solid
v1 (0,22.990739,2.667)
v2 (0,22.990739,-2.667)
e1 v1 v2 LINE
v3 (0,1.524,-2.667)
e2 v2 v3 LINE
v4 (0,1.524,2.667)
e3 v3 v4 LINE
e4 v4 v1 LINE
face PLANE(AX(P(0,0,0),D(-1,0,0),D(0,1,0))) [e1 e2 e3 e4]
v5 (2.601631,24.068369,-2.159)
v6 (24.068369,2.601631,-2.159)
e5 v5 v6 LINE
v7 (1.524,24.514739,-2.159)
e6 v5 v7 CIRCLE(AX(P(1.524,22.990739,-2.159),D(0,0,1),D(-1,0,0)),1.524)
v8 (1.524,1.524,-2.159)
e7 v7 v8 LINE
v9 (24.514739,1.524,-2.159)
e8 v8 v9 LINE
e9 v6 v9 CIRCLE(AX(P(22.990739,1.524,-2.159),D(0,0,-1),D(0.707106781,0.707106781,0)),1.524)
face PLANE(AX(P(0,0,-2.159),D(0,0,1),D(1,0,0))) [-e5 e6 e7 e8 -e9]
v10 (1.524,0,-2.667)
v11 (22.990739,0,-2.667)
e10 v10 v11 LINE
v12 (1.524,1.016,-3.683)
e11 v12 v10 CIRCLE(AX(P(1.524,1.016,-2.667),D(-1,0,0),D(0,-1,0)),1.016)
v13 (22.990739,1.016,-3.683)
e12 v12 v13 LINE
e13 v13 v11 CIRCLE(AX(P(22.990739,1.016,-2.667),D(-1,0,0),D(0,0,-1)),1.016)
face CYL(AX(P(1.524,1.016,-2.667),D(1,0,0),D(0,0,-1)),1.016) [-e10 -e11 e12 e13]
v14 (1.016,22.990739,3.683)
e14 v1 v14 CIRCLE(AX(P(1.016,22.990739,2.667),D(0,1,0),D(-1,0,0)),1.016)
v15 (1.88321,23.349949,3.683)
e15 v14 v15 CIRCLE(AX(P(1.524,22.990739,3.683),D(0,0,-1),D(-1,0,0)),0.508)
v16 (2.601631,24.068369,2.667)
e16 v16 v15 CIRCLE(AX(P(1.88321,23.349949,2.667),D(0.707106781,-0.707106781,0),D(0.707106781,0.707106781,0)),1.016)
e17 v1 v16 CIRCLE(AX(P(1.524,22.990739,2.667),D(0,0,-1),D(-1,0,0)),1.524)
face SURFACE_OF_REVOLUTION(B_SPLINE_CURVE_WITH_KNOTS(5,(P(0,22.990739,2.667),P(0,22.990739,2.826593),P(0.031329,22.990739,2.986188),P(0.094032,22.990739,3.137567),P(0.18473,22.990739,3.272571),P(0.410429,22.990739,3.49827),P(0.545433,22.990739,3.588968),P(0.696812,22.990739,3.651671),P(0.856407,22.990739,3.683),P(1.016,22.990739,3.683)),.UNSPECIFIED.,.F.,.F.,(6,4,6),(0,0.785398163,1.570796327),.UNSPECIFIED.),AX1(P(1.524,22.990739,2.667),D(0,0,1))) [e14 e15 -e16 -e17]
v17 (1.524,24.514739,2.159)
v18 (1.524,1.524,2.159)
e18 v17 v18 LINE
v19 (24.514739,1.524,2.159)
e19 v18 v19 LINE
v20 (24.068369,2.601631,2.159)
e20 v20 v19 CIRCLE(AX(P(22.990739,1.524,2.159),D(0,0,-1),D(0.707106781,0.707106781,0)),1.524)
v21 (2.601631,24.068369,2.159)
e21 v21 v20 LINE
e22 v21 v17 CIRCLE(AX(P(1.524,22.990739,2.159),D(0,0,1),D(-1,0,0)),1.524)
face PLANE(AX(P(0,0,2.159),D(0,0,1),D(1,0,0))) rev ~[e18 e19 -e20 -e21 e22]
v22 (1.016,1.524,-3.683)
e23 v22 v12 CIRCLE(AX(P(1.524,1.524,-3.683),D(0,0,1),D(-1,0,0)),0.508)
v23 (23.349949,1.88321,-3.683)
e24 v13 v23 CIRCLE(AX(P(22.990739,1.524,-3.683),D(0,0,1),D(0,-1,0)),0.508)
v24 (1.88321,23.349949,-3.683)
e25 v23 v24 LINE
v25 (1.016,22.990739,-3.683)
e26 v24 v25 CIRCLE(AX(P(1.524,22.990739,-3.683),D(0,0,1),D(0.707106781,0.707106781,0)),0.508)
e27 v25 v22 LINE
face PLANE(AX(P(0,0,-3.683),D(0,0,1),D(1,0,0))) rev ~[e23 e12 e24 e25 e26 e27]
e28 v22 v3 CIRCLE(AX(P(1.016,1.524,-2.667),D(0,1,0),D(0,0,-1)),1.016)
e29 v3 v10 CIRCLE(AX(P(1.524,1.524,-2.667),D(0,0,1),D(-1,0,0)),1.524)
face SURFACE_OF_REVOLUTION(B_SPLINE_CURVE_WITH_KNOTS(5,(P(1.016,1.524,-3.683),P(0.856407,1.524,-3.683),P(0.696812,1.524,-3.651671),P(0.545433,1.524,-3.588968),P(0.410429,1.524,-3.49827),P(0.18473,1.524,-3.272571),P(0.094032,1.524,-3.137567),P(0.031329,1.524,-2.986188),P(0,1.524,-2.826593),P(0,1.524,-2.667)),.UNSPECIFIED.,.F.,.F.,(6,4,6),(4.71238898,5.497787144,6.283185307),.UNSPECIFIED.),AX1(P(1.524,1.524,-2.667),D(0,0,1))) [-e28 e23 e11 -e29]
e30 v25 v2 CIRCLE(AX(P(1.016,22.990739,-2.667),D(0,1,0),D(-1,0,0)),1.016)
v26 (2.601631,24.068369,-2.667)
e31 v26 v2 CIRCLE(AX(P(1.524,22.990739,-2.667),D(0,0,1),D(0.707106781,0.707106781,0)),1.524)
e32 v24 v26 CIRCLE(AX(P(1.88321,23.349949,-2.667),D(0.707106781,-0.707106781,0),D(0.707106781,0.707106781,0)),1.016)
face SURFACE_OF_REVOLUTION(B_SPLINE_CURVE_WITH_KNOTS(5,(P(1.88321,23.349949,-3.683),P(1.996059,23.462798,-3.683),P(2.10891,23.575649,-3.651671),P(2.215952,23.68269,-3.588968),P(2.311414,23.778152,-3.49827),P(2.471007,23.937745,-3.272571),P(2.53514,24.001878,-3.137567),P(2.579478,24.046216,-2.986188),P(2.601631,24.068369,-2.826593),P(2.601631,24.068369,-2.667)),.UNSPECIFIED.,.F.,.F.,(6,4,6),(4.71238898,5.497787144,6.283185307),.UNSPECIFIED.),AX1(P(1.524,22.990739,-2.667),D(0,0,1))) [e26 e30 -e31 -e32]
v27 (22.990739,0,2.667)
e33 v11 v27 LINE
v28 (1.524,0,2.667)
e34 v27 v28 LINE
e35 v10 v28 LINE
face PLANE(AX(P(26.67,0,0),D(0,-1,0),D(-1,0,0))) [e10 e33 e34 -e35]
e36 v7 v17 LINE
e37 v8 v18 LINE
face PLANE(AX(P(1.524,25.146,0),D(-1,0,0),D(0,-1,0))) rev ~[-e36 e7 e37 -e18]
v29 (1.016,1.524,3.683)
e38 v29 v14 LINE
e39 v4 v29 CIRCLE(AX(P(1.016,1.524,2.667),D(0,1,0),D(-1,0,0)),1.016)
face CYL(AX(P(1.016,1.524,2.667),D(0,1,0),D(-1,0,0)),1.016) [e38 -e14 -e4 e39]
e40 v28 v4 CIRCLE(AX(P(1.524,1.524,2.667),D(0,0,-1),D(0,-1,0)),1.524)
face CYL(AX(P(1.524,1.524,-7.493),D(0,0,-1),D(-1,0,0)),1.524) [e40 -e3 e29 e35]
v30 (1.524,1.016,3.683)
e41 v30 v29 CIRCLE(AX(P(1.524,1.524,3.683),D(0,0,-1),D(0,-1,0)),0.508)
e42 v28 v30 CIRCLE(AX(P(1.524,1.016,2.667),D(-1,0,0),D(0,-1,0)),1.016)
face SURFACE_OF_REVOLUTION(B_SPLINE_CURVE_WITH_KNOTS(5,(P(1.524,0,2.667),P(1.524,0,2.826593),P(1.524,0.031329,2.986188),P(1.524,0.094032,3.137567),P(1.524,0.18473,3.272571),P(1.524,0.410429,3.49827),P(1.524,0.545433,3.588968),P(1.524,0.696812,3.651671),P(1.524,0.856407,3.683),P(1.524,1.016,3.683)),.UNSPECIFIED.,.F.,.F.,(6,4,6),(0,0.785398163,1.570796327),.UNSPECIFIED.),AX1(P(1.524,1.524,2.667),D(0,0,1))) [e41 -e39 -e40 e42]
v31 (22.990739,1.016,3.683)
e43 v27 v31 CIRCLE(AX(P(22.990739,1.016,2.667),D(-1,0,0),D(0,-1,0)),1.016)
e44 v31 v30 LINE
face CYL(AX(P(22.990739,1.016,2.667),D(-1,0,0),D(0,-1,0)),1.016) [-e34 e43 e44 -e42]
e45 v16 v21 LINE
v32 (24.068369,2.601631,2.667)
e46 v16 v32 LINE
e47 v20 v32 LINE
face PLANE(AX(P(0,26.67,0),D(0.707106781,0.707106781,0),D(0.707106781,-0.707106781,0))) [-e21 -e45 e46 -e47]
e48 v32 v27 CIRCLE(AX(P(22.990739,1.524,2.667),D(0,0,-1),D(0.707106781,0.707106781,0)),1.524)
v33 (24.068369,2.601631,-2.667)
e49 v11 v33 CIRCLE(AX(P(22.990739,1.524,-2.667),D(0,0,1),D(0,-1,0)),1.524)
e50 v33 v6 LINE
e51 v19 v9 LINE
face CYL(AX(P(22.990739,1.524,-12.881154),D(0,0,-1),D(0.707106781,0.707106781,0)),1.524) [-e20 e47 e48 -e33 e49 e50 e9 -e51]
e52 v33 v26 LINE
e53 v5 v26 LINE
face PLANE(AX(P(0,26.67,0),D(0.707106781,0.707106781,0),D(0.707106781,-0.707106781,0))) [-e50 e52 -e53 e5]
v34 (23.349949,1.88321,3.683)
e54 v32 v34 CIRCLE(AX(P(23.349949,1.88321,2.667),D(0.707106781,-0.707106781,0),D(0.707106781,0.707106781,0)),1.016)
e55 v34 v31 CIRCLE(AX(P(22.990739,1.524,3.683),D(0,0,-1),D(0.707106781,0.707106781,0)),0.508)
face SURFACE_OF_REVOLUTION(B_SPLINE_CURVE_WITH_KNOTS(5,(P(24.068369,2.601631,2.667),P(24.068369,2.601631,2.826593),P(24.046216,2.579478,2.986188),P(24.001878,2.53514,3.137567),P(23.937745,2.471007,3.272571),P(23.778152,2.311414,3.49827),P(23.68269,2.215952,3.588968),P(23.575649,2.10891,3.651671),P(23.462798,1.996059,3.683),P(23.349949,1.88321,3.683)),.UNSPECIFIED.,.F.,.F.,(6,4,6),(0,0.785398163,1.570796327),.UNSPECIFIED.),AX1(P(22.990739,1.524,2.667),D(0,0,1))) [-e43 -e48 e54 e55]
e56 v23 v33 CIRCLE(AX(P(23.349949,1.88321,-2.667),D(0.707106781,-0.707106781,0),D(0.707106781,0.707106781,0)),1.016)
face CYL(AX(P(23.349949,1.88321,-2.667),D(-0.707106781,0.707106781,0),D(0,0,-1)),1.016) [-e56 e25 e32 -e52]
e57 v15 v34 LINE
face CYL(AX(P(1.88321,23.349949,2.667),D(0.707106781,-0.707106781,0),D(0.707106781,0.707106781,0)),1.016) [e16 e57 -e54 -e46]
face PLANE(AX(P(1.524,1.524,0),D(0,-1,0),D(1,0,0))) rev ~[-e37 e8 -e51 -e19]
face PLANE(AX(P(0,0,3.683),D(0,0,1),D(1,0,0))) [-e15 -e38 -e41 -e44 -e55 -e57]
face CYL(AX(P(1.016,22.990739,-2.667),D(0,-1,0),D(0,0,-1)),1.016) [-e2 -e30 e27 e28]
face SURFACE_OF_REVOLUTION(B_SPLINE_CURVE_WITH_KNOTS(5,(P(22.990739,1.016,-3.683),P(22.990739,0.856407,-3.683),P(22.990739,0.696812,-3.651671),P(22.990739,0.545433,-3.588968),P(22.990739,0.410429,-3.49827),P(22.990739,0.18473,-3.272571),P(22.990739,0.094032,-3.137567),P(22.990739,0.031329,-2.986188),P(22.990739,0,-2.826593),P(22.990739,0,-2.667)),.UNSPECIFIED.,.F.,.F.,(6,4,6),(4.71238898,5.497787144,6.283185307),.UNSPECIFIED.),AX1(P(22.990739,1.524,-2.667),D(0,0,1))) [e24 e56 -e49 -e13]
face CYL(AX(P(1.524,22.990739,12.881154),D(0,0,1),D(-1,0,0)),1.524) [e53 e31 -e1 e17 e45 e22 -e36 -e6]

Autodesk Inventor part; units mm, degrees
ref_plane "YZ Plane" through (0, 0, 0) normal (1, 0, 0) x (0, 1, 0)
ref_plane "XZ Plane" through (0, 0, 0) normal (0, 1, 0) x (-1, 0, 0)
ref_plane "XY Plane" through (0, 0, 0) normal (0, 0, 1) x (1, 0, 0)
sketch "Sketch1" plane through (0, 0, 0) normal (0, 0, 1) x (1, 0, 0)
  line L0 (0, 0) -> (-13.377, 0)
  line L1 (0, 0) -> (0, 26.67)
  line L2 (0, 26.67) -> (26.67, 0)
  line L3 (26.67, 0) -> (0, 0)
  dimension "d0" = 26.67
extrude "Extrusion1" add sketch "Sketch1" along normal mid plane 7.366
sketch "Sketch3" plane through (0, 0, 0) normal (0, 0, 1) x (1, 0, 0)
  line L0 (0, 26.67) -> (26.67, 0) projected
  line L1 (0, 0) -> (0, 26.67) projected
  line L2 (26.67, 0) -> (0, 0) projected
  line L3 (1.524, 25.146) -> (1.524, 1.524)
  line L4 (1.524, 1.524) -> (25.146, 1.524)
  line L5 (1.524, 25.146) -> (25.146, 1.524)
  dimension "d3" = 1.524
  dimension "d4" = 1.524
extrude "Extrusion2" cut sketch "Sketch3" against normal mid plane 4.318 contours L0 L4 L3
fillet "Fillet1" radius 1.524 3 edges at (0, 26.67, 0) (0, 0, 0) (26.67, 0, 0)
fillet "Fillet2" radius 1.016 6 edges at (0.4464, 0.4464, 3.683) (12.2574, 0, 3.683) (24.3987, 0.9408, 3.683) (13.335, 13.335, 3.683) (0.9408, 24.3987, 3.683) (0, 12.2574, 3.683)
fillet "Fillet3" radius 1.016 6 edges at (0.9408, 24.3987, -3.683) (13.335, 13.335, -3.683) (24.3987, 0.9408, -3.683) (12.2574, 0, -3.683) (0.4464, 0.4464, -3.683) (0, 12.2574, -3.683)
equation "\"d0\" = edgeSize"
equation "\"d1\" = partThickness"
equation "\"d3\" = edgeThickness"
equation "\"d4\" = edgeThickness"
equation "\"d5\" = mirrorThickness"
equation "\"d7\" = filetForCorners"
equation "\"d8\" = filetForFlat"
equation "\"d9\" = filetForFlat"
equation "\"edgeSize\" = 26.67"
equation "\"wallThickness\" = 1.524"
equation "\"mirrorThickness\" = 4.318"
equation "\"partThickness\" = mirrorThickness + 2 * wallThickness"
equation "\"edgeThickness\" = 1.524"
equation "\"filetForCorners\" = 1.524"
equation "\"filetForFlat\" = 1.016"
properties part number "Mirror Corner"
